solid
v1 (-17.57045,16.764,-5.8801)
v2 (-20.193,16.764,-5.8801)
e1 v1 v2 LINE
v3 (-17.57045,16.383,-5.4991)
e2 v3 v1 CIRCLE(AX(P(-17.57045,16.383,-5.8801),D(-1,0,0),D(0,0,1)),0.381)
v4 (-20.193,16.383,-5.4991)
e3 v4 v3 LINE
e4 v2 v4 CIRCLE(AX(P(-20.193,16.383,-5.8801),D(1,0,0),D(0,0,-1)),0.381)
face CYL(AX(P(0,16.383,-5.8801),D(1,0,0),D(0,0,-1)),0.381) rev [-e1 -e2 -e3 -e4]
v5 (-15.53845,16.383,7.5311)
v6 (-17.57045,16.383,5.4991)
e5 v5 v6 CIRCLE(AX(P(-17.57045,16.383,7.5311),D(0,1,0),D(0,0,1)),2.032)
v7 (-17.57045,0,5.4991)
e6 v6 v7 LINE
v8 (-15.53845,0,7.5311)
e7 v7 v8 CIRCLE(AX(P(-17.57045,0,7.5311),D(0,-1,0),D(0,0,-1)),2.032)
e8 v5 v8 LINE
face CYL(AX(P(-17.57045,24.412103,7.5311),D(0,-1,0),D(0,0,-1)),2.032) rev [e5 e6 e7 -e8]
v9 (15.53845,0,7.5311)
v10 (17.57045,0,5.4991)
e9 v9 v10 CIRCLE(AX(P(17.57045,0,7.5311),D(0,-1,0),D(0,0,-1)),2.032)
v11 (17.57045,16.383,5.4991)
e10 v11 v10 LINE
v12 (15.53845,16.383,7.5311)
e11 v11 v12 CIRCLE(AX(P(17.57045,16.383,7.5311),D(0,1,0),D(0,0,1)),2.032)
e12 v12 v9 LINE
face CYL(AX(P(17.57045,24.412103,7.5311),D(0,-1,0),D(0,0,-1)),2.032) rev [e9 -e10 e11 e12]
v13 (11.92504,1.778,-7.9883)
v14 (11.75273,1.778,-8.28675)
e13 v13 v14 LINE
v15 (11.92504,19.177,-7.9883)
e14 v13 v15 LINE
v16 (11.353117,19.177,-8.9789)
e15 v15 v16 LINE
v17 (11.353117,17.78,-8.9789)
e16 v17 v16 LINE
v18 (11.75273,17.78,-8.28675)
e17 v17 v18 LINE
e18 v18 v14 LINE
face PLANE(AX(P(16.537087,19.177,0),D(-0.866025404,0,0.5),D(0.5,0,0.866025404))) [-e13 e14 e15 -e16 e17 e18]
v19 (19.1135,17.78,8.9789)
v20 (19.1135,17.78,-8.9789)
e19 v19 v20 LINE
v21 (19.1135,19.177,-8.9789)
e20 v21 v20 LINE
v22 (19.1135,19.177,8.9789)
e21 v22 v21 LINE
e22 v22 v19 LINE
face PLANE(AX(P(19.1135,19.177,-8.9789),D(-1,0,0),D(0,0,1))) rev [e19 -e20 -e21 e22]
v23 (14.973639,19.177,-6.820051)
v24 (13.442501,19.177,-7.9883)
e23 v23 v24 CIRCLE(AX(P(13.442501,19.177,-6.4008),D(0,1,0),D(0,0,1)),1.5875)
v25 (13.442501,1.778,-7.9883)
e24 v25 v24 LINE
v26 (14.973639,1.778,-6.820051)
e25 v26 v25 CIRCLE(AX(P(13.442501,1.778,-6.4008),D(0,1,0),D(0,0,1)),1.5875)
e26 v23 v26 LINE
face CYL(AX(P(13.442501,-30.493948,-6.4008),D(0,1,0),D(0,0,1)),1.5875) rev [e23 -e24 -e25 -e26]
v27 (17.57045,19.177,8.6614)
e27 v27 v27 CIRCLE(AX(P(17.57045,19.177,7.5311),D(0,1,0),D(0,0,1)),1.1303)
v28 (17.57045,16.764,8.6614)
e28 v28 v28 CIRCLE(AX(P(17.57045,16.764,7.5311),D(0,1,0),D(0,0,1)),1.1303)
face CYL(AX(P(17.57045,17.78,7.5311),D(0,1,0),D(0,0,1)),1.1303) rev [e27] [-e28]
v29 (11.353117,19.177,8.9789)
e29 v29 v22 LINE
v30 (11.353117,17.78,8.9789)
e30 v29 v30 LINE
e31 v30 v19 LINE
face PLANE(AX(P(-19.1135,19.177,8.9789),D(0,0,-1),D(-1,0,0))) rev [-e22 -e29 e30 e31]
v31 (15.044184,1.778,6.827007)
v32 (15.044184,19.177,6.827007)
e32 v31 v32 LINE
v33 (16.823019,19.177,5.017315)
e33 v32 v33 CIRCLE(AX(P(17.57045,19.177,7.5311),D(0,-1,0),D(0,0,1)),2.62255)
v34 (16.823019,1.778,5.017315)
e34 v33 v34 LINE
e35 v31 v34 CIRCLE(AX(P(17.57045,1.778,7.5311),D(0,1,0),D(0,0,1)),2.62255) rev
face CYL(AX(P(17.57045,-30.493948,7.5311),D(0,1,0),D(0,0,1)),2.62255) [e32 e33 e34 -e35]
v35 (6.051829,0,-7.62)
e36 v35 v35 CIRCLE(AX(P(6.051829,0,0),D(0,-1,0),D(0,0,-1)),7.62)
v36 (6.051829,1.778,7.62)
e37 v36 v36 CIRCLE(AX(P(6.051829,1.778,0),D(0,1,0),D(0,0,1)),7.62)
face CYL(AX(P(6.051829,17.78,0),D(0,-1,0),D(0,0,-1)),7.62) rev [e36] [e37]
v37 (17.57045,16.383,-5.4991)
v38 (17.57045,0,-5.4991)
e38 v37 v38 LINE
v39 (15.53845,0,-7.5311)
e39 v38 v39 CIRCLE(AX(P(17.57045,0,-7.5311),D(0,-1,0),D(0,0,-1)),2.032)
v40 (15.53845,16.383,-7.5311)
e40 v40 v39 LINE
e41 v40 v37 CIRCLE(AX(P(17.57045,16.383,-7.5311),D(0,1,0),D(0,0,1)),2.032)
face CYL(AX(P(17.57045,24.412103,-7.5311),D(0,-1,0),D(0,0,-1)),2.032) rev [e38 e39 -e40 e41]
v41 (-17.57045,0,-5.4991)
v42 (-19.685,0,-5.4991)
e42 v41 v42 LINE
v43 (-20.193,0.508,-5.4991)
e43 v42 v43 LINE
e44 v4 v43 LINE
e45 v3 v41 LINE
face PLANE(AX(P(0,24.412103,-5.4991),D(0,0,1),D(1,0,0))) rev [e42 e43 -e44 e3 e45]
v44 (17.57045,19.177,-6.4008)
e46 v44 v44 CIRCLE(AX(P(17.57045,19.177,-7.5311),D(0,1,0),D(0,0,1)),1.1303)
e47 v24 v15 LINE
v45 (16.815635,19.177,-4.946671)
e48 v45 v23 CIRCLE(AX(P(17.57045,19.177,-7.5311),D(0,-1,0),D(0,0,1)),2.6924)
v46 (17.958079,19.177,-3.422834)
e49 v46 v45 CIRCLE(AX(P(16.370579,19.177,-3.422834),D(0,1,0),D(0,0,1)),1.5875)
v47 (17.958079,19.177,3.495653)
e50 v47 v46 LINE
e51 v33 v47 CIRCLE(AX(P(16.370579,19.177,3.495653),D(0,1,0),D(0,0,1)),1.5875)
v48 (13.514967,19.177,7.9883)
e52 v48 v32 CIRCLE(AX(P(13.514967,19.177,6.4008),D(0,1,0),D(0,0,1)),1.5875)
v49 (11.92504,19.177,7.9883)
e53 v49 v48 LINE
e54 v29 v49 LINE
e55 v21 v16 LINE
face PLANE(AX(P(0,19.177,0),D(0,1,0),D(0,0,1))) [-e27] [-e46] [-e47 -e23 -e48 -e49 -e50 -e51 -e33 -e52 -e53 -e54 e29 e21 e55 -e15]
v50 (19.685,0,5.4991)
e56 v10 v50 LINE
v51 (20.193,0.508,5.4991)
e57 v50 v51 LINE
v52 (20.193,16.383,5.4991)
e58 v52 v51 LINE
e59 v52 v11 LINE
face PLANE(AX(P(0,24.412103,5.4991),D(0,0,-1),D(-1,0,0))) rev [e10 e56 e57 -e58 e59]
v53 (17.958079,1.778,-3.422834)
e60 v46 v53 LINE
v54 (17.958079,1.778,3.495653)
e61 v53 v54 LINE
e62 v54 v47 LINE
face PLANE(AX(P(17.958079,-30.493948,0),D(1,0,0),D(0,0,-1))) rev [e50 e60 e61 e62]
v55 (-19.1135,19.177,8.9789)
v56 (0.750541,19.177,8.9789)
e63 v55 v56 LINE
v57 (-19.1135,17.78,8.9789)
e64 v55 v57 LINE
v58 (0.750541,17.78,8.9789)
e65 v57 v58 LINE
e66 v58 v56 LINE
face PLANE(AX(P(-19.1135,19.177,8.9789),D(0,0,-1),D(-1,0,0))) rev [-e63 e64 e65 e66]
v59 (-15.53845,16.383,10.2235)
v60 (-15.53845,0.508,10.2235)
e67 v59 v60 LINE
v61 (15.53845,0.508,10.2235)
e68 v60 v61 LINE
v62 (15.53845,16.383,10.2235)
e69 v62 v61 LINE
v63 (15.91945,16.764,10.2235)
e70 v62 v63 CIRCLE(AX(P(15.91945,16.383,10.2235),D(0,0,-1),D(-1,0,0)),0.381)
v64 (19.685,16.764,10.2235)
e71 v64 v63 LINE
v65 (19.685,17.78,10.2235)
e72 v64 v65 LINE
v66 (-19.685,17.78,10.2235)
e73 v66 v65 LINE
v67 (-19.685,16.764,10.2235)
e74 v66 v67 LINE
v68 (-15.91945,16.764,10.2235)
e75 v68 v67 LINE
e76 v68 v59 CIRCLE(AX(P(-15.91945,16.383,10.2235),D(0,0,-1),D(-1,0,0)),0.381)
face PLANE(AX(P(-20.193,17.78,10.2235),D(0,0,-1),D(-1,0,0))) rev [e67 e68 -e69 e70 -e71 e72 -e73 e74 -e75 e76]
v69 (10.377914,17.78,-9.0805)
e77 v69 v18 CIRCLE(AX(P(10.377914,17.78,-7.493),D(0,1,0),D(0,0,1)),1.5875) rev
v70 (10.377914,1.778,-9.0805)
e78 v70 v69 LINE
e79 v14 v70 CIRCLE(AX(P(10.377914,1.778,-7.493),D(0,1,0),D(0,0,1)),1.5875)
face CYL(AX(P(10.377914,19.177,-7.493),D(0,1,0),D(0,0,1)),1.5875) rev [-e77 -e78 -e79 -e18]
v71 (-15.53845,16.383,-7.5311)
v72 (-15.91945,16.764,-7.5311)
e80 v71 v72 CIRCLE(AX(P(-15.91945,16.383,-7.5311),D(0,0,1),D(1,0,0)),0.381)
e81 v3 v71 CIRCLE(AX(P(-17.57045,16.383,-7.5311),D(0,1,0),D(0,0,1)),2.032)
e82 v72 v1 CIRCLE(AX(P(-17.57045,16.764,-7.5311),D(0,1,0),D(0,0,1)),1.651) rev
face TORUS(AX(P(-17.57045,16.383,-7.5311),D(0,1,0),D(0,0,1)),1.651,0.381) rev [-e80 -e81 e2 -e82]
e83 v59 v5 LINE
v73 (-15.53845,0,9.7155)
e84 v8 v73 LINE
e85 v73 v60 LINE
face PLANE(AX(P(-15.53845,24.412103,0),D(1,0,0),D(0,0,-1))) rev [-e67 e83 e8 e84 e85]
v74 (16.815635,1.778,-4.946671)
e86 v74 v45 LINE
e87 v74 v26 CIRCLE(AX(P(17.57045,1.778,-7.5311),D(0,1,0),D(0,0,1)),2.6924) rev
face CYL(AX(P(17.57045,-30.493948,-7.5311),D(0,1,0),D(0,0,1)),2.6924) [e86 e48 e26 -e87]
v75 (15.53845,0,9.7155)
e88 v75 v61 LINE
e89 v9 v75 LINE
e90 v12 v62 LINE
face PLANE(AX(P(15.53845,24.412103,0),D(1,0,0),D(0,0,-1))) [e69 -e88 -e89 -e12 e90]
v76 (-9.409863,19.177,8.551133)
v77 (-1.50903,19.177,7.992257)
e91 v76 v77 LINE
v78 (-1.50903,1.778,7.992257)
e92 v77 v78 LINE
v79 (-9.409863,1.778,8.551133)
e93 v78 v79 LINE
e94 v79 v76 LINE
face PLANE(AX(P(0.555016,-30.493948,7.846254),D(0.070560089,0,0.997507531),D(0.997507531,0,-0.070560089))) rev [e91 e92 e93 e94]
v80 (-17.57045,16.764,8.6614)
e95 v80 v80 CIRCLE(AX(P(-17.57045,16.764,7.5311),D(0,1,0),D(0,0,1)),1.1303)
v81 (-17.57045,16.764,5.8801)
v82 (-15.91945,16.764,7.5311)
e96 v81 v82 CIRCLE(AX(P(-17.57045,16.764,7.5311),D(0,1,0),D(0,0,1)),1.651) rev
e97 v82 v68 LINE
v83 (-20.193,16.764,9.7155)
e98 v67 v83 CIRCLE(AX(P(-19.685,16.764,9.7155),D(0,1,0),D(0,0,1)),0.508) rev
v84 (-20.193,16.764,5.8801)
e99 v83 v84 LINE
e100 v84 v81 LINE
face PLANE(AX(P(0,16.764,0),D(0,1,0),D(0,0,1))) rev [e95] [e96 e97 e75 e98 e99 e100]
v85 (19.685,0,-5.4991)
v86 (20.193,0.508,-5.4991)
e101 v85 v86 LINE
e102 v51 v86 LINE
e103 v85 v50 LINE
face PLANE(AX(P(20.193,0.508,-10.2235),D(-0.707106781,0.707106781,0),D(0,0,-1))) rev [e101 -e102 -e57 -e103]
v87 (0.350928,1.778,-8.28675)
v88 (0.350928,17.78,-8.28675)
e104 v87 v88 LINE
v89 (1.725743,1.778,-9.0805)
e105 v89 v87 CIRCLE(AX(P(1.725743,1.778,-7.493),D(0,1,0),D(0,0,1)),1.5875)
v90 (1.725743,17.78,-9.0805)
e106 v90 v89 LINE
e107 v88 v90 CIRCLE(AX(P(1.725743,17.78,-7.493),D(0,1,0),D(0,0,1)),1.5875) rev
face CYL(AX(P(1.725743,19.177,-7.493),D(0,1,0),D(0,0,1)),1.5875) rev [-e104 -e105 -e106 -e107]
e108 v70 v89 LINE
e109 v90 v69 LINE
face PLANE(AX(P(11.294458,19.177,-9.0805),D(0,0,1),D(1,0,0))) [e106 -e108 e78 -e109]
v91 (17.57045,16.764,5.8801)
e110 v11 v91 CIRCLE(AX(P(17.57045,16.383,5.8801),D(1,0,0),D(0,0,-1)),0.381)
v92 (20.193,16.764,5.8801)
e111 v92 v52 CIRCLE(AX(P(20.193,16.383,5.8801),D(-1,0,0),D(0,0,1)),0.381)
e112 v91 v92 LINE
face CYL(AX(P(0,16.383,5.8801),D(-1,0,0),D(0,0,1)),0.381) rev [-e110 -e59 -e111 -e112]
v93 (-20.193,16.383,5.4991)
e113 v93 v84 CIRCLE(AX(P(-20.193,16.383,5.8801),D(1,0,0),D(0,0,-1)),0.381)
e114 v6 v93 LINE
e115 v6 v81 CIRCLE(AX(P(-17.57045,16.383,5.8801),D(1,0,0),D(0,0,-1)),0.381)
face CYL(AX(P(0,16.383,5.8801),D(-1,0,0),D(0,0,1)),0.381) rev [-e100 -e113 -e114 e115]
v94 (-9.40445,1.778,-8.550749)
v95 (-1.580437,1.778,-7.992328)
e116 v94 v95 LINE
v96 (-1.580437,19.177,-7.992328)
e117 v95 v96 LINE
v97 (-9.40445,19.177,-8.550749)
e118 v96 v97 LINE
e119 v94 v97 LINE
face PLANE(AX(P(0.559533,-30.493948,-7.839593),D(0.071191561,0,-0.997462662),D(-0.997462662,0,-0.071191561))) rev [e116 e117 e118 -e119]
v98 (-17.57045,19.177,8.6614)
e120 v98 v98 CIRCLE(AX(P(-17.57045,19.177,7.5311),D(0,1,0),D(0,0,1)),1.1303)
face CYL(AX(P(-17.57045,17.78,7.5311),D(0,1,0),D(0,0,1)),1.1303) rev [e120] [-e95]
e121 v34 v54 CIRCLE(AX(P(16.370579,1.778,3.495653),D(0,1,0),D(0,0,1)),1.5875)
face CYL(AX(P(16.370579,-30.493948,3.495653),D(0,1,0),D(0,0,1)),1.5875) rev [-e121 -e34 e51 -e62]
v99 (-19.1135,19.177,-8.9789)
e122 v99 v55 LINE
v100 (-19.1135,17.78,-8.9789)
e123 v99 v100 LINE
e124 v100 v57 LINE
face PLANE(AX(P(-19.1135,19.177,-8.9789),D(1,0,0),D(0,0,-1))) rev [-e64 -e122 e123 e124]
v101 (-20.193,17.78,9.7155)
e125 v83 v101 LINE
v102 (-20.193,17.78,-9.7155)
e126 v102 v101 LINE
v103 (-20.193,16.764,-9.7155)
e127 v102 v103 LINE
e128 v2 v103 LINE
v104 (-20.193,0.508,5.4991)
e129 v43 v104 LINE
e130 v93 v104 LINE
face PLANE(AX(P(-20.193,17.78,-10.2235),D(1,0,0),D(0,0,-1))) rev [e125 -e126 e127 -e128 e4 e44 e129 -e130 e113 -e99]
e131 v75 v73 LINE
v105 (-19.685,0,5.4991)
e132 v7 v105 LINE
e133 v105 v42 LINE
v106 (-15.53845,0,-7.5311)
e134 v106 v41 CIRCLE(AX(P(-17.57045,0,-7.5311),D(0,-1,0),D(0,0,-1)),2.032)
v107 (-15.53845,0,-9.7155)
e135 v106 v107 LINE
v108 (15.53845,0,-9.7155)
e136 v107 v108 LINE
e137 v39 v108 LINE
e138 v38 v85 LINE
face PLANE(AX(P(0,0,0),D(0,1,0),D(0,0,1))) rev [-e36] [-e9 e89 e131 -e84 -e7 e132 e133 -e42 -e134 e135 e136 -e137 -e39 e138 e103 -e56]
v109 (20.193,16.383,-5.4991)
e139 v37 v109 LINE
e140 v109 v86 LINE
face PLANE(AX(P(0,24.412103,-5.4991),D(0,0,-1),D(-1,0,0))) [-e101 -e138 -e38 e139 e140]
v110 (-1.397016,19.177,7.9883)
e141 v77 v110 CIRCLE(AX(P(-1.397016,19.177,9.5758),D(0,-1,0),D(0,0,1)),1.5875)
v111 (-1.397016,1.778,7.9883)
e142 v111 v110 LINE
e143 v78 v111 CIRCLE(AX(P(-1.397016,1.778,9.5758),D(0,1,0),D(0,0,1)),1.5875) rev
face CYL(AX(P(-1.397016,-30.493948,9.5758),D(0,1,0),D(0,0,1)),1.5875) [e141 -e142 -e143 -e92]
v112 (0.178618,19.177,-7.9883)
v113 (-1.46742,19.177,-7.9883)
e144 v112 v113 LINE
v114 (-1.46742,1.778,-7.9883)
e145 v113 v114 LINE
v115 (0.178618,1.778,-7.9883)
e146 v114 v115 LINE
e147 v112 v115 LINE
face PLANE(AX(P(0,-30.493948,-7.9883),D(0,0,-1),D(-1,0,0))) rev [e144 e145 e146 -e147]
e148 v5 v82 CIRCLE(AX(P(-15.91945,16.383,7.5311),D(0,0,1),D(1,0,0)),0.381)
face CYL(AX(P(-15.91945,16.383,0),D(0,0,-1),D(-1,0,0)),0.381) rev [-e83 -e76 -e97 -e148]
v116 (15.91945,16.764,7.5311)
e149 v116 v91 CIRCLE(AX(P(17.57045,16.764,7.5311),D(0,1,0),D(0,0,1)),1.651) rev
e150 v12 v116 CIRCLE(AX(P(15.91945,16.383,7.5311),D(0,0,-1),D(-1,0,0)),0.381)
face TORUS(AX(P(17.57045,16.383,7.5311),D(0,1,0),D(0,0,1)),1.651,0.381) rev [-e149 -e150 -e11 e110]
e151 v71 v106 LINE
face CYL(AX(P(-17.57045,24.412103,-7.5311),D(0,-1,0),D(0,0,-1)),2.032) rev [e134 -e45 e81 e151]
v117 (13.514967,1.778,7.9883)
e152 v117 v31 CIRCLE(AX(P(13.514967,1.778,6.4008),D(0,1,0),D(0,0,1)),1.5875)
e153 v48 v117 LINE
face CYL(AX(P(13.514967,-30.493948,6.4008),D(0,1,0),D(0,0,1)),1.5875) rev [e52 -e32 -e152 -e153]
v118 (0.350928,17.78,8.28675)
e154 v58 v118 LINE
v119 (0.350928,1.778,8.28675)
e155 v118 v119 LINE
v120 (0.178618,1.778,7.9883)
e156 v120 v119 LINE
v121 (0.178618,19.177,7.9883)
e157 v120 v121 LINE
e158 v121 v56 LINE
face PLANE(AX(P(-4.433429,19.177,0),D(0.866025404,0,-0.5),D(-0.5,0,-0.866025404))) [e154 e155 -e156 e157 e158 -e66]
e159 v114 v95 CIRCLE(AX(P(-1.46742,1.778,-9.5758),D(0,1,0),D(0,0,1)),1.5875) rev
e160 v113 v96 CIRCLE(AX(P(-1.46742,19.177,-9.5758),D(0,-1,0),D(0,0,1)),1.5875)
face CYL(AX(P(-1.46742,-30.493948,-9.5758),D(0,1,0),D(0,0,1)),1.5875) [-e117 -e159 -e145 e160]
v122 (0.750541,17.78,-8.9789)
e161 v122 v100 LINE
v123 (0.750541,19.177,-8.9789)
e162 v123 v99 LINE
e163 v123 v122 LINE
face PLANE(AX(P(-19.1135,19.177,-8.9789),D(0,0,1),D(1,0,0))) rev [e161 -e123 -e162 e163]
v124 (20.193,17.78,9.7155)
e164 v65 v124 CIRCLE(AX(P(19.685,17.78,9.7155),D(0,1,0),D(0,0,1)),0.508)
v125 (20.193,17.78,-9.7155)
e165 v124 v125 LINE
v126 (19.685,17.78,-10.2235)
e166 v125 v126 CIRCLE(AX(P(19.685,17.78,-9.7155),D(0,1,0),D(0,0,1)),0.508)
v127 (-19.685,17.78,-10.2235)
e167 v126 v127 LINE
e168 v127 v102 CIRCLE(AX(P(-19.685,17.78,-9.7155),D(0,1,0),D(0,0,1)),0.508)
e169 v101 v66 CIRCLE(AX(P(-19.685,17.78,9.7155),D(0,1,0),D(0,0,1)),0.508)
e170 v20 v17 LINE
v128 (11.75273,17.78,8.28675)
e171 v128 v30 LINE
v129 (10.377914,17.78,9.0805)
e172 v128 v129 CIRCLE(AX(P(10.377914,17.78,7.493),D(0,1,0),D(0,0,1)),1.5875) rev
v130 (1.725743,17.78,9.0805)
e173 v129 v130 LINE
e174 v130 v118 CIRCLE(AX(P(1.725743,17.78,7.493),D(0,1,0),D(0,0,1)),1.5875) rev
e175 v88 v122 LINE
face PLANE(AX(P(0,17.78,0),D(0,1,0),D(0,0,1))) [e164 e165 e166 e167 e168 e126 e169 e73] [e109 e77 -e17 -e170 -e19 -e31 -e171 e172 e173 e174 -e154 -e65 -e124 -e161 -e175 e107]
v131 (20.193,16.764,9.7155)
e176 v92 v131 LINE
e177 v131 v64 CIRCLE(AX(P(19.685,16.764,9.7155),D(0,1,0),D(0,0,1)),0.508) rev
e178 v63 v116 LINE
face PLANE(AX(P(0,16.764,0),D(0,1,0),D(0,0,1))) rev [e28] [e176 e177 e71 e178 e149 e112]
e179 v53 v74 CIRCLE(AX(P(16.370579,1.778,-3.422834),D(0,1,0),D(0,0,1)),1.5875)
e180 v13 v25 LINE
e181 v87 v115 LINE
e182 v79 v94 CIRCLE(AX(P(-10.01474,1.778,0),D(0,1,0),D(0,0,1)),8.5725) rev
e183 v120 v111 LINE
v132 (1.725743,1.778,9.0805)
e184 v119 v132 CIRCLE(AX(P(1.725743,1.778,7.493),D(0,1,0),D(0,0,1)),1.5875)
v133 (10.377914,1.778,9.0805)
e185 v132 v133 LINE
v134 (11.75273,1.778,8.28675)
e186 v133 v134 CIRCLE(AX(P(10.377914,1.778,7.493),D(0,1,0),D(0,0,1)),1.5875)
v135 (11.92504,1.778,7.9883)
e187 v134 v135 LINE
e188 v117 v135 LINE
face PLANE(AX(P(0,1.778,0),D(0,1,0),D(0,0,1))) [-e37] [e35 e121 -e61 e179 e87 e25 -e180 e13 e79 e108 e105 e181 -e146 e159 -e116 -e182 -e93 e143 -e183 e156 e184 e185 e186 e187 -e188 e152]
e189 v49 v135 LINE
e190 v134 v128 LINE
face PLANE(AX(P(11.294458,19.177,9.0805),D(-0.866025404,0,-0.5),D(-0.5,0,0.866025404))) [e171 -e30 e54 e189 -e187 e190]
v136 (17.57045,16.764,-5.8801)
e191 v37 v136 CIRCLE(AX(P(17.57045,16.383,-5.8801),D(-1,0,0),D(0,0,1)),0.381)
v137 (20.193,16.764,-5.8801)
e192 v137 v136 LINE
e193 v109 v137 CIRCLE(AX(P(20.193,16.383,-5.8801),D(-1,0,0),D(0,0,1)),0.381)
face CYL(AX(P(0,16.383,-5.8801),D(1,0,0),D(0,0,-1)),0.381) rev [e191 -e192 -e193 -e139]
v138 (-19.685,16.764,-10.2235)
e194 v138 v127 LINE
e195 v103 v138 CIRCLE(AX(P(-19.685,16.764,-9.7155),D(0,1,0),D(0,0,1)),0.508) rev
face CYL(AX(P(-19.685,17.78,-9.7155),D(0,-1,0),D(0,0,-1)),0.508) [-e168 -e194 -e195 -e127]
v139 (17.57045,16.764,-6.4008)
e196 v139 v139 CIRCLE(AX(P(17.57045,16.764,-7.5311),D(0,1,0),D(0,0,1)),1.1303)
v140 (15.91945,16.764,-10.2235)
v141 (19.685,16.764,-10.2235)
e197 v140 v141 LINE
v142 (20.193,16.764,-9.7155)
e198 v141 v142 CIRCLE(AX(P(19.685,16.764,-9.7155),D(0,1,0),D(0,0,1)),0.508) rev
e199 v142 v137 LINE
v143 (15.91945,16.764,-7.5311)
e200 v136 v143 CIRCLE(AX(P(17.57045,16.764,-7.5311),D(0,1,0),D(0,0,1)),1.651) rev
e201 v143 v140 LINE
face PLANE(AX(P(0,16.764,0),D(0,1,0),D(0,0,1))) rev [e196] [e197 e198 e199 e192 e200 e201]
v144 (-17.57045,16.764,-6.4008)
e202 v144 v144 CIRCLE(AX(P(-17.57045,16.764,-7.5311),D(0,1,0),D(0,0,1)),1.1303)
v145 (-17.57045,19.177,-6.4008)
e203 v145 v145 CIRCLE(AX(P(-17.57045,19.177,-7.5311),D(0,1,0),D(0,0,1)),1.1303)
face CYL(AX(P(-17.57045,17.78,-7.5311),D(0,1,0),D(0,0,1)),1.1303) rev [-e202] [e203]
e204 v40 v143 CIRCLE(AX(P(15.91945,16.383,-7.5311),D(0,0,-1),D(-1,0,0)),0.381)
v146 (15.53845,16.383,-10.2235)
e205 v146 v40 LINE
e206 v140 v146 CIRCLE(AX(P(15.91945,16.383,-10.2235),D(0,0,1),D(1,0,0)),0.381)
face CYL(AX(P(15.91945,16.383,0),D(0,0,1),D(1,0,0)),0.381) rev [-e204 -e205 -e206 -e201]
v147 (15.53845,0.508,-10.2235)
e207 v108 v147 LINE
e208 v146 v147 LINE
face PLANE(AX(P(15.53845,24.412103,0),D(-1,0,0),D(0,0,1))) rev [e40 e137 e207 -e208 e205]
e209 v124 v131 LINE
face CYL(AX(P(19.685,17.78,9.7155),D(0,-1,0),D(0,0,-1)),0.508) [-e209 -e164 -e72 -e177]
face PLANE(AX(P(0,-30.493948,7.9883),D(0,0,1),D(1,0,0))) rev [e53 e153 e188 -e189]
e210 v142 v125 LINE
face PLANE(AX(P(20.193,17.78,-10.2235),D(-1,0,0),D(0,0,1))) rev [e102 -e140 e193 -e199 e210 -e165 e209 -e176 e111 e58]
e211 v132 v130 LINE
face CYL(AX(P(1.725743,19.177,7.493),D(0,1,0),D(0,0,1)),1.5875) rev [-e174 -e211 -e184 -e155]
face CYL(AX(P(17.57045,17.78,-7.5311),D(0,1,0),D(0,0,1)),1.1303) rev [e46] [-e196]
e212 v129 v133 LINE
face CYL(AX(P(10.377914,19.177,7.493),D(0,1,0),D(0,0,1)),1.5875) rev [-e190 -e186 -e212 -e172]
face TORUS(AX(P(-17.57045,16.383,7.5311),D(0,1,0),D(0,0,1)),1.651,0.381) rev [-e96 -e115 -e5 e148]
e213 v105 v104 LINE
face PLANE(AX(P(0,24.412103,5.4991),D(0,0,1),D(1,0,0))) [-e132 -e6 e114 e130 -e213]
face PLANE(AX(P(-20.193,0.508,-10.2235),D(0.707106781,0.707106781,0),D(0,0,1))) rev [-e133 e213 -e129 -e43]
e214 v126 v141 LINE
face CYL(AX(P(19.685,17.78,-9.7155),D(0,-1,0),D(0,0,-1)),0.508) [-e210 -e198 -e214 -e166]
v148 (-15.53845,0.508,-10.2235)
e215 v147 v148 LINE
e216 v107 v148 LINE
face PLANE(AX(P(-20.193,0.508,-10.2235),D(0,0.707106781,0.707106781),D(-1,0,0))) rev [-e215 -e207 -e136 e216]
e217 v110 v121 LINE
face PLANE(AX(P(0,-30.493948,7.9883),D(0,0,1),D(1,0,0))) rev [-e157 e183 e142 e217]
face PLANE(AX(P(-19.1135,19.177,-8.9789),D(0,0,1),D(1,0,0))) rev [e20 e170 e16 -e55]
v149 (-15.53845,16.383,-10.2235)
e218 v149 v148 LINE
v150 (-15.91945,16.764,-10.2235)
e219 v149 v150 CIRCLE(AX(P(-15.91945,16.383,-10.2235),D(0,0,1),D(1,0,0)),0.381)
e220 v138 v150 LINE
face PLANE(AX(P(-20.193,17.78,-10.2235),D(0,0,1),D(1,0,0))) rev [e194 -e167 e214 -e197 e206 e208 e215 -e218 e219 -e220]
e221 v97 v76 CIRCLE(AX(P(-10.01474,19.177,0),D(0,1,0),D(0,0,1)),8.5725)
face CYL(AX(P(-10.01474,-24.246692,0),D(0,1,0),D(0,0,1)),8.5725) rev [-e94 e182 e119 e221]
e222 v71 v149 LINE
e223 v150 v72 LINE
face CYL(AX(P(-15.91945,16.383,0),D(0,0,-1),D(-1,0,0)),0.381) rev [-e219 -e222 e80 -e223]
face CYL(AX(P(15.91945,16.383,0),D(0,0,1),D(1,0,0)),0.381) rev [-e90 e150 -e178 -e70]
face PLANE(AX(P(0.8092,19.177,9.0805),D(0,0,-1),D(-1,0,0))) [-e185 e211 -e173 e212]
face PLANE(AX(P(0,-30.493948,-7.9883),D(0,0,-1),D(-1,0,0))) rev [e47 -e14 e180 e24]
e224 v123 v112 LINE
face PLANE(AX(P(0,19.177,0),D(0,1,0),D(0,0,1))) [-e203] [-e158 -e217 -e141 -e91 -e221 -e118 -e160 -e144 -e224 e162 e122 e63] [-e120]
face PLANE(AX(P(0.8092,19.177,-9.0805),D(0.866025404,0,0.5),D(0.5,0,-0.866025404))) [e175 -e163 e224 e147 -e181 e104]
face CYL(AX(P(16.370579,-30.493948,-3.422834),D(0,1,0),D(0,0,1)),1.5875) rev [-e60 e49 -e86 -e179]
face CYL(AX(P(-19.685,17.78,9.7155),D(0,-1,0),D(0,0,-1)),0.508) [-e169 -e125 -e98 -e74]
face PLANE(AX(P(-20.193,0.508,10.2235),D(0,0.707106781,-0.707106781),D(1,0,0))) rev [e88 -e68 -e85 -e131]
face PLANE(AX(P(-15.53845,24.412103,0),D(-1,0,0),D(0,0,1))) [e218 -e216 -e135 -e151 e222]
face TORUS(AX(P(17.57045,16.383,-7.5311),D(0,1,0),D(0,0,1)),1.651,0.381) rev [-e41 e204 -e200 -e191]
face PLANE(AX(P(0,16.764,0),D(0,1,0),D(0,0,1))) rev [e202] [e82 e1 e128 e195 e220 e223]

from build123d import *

# Parameters (mm, degrees)
SKETCH1_W             = 40.386
SKETCH1_H             = 20.447
BOSS_EXTRUDE1_DEPTH   = 17.78
FILLET1_R             = 0.508
CHAMFER1_SIZE         = 0.508
F_2_CLEARANCE_HOLE1_D = 2.2606
SKETCH6_R             = 8.5725
CUT_EXTRUDE1_DEPTH    = 16.002
CUT_EXTRUDE4_DEPTH    = 16.002
FILLET3_R             = 1.5875
SKETCH9_R             = 1.1303
CUT_EXTRUDE5_DEPTH    = 16.764
FILLET5_R             = 0.381
SKETCH11_R            = 7.62
CUT_EXTRUDE7_DEPTH    = 29.782036086
BOSS_EXTRUDE3_START   = 1.397
SKETCH12_W            = 38.227
SKETCH12_H            = 17.9578
SKETCH12_R            = 1.1303
BOSS_EXTRUDE3_DEPTH   = 1.397
CUT_EXTRUDE8_DEPTH    = 29.548246921
FILLET7_R             = 1.5875
CUT_EXTRUDE9_DEPTH    = 1.397


with BuildPart() as part:
    # Sketch1 → Boss-Extrude1 (new body)
    with BuildSketch(Plane(origin=(0, 0, 0), x_dir=(1, 0, 0), z_dir=(0, 1, 0))):
        Rectangle(SKETCH1_W, SKETCH1_H)
    extrude(amount=BOSS_EXTRUDE1_DEPTH)

    # Fillet1
    fillet1_edges = [part.edges().sort_by_distance(p)[0] for p in [
        (20.193, 8.89, 10.2235),
        (-20.193, 8.89, 10.2235),
        (-20.193, 8.89, -10.2235),
        (20.193, 8.89, -10.2235),
    ]]
    fillet(fillet1_edges, radius=FILLET1_R)

    # Chamfer1
    chamfer1_edges = [part.edges().sort_by_distance(p)[0] for p in [
        (20.193, 0, 0),
        (0, 0, 10.2235),
        (-20.193, 0, 0),
        (0, 0, -10.2235),
        (-20.044210245, 0, 10.074710245),
        (-20.044210245, 0, -10.074710245),
        (20.044210245, 0, -10.074710245),
        (20.044210245, 0, 10.074710245),
    ]]
    chamfer(chamfer1_edges, length=CHAMFER1_SIZE)

    # #2 Clearance Hole1 (through all)
    with Locations(Plane(origin=(0, 17.78, 0), x_dir=(1, 0, 0), z_dir=(0, 1, 0))):
        with Locations((17.57045, -7.5311), (-17.57045, 7.5311), (-17.57045, -7.5311), (17.57045, 7.5311)):
            Hole(F_2_CLEARANCE_HOLE1_D / 2)

    # Sketch6 → Cut-Extrude1 (cut)
    with BuildSketch(Plane(origin=(0, 17.78, 0), x_dir=(1, 0, 0), z_dir=(0, 1, 0))):
        with Locations(Location((-10.014739789, 0, 0), (0, 0, 270))):
            Circle(SKETCH6_R)
    extrude(amount=-CUT_EXTRUDE1_DEPTH, mode=Mode.SUBTRACT)

    # Sketch10 → Cut-Extrude4 (cut)
    with BuildSketch(Plane(origin=(0, 17.78, 0), x_dir=(1, 0, 0), z_dir=(0, 1, 0))):
        with BuildLine():
            Line((-1.45309254, -7.9883), (14.988060281, -7.9883))
            ThreePointArc((14.988060281, -7.9883), (15.691271985, -5.7017672), (17.958078801, -4.937355137))
            Line((17.958078801, -4.937355137), (17.958078801, 4.866749859))
            ThreePointArc((17.958078801, 4.866749859), (15.641892996, 5.652354237), (14.917152821, 7.9883))
            Line((14.917152821, 7.9883), (-1.524, 7.9883))
            Line((-1.524, 7.9883), (-9.404450133, 8.550748668))
            ThreePointArc((-9.404450133, 8.550748668), (-1.442240219, -0.00271347), (-9.409863426, -8.551133307))
            Line((-9.409863426, -8.551133307), (-1.45309254, -7.9883))
        make_face()
    extrude(amount=-CUT_EXTRUDE4_DEPTH, mode=Mode.SUBTRACT)

    # Fillet3
    # the kernel refuses this fillet: 1.5875 mm, written as the material it adds along each edge
    with BuildSketch(Plane(origin=(14.917152821, 17.78, -7.9883), x_dir=(-1, 0, 0), z_dir=(0, -1, 0))) as fillet3_piece_1:
        with BuildLine():
            CenterArc((1.474652181, -1.5875), FILLET3_R, 90, 74.686818151)
            ThreePointArc((-0.056486306, -1.168249258), (0.035961125, -0.587228986), (0, 0))
            Line((0, 0), (1.474652181, 0))
        make_face()
    extrude(amount=16.002)
    with BuildSketch(Plane(origin=(17.958078801, 17.78, -4.866749859), x_dir=(-0.9975619874511197, 0, -0.06978596701753238), z_dir=(0, -1, 0))) as fillet3_piece_2:
        with BuildLine():
            CenterArc((1.48286456, -1.551181233), FILLET3_R, 102.279418141, 73.718887891)
            Line((-0.100765095, -1.44039601), (0, 0))
            ThreePointArc((0, 0), (0.572618009, -0.061596629), (1.145236017, 0))
        make_face()
    extrude(amount=16.002)
    with BuildSketch(Plane(origin=(17.958078801, 17.78, 4.937355137), x_dir=(0, 0, -1), z_dir=(0, -1, 0))) as fillet3_piece_3:
        with BuildLine():
            CenterArc((1.441701842, -1.5875), FILLET3_R, 90, 73.441052757)
            ThreePointArc((-0.079959812, -1.13505988), (0.022321973, -0.571918824), (0, 0))
            Line((0, 0), (1.441701842, 0))
        make_face()
    extrude(amount=16.002)
    with BuildSketch(Plane(origin=(14.988060281, 17.78, 7.9883), x_dir=(0.048272098089337995, 0, -0.9988342227547339), z_dir=(0, -1, 0))) as fillet3_piece_4:
        with BuildLine():
            CenterArc((1.514540022, -1.548008005), FILLET3_R, 102.806774289, 74.426362957)
            Line((-0.071109307, -1.47137605), (0, 0))
            ThreePointArc((0, 0), (0.581324376, -0.065240775), (1.162648753, 0))
        make_face()
    extrude(amount=16.002)
    # the kernel refuses this fillet: 1.5875 mm, written as the material it takes off along each edge
    with BuildSketch(Plane(origin=(-1.524, 17.921450207, -7.9883), x_dir=(-0.9974626617850719, 0, -0.0711915609088555), z_dir=(0, -1, 0))) as fillet3_2_piece_1:
        with BuildLine():
            CenterArc((FILLET3_R * 0.0356409970864, FILLET3_R), FILLET3_R, 265.917570604, 4.082429396)
            Line((-FILLET3_R * 0.0355505638225, FILLET3_R * 0.00253733821493), (0, 0))
            Line((0, 0), (FILLET3_R * 0.0356409970864, 0))
        make_face()
    extrude(amount=16.143450207, mode=Mode.SUBTRACT)
    with BuildSketch(Plane(origin=(-1.45309254, 17.920192389, 7.9883), x_dir=(-0.9975075307142005, 0, 0.07056008906214724), z_dir=(0, -1, 0))) as fillet3_2_piece_2:
        with BuildLine():
            CenterArc((FILLET3_R * 0.0353240666066, -FILLET3_R), FILLET3_R, 90, 4.046157505)
            Line((-FILLET3_R * 0.0352360224555, -FILLET3_R * 0.0024924692858), (0, 0))
            Line((0, 0), (FILLET3_R * 0.0353240666066, 0))
        make_face()
    extrude(amount=16.142192389, mode=Mode.SUBTRACT)

    # Sketch9 → Cut-Extrude5 (cut)
    # profile 1 of 8: a face of its own
    with BuildSketch(Plane.XZ):
        with BuildLine():
            Line((-19.685, 9.7155), (-19.685, 5.4991))
            Line((-19.685, 5.4991), (-17.57045, 5.4991))
            ThreePointArc((-17.57045, 5.4991), (-16.133609021, 6.094259021), (-15.53845, 7.5311))
            Line((-15.53845, 7.5311), (-15.53845, 9.7155))
            Line((-15.53845, 9.7155), (-19.685, 9.7155))
        make_face()
        with Locations(Location((-17.57045, 7.5311, 0), (0, 0, 90))):
            Circle(SKETCH9_R, mode=Mode.SUBTRACT)
    # profile 2 of 8: a face of its own
    with BuildSketch(Plane.XZ):
        with BuildLine():
            Line((-20.193, 5.4991), (-19.685, 5.4991))
            Line((-19.685, 5.4991), (-19.685, 9.7155))
            Line((-19.685, 9.7155), (-15.53845, 9.7155))
            Line((-15.53845, 9.7155), (-15.53845, 10.2235))
            Line((-15.53845, 10.2235), (-19.685, 10.2235))
            ThreePointArc((-19.685, 10.2235), (-20.044210245, 10.074710245), (-20.193, 9.7155))
            Line((-20.193, 9.7155), (-20.193, 5.4991))
        make_face()
    # profile 3 of 8: a face of its own
    with BuildSketch(Plane.XZ):
        with BuildLine():
            ThreePointArc((-15.53845, -7.5311), (-16.133609021, -6.094259021), (-17.57045, -5.4991))
            Line((-17.57045, -5.4991), (-19.685, -5.4991))
            Line((-19.685, -5.4991), (-19.685, -9.7155))
            Line((-19.685, -9.7155), (-15.53845, -9.7155))
            Line((-15.53845, -9.7155), (-15.53845, -7.5311))
        make_face()
        with Locations(Location((-17.57045, -7.5311, 0), (0, 0, 90))):
            Circle(SKETCH9_R, mode=Mode.SUBTRACT)
    # profile 4 of 8: a face of its own
    with BuildSketch(Plane.XZ):
        with BuildLine():
            Line((-19.685, -9.7155), (-19.685, -5.4991))
            Line((-19.685, -5.4991), (-20.193, -5.4991))
            Line((-20.193, -5.4991), (-20.193, -9.7155))
            ThreePointArc((-20.193, -9.7155), (-20.044210245, -10.074710245), (-19.685, -10.2235))
            Line((-19.685, -10.2235), (-15.53845, -10.2235))
            Line((-15.53845, -10.2235), (-15.53845, -9.7155))
            Line((-15.53845, -9.7155), (-19.685, -9.7155))
        make_face()
    # profile 5 of 8: a face of its own
    with BuildSketch(Plane.XZ):
        with BuildLine():
            Line((19.685, 9.7155), (15.53845, 9.7155))
            Line((15.53845, 9.7155), (15.53845, 7.5311))
            ThreePointArc((15.53845, 7.5311), (16.133609021, 6.094259021), (17.57045, 5.4991))
            Line((17.57045, 5.4991), (19.685, 5.4991))
            Line((19.685, 5.4991), (19.685, 9.7155))
        make_face()
        with Locations(Location((17.57045, 7.5311, 0), (0, 0, 90))):
            Circle(SKETCH9_R, mode=Mode.SUBTRACT)
    # profile 6 of 8: a face of its own
    with BuildSketch(Plane.XZ):
        with BuildLine():
            Line((15.53845, 10.2235), (15.53845, 9.7155))
            Line((15.53845, 9.7155), (19.685, 9.7155))
            Line((19.685, 9.7155), (19.685, 5.4991))
            Line((19.685, 5.4991), (20.193, 5.4991))
            Line((20.193, 5.4991), (20.193, 9.7155))
            ThreePointArc((20.193, 9.7155), (20.044210245, 10.074710245), (19.685, 10.2235))
            Line((19.685, 10.2235), (15.53845, 10.2235))
        make_face()
    # profile 7 of 8: a face of its own
    with BuildSketch(Plane.XZ):
        with BuildLine():
            Line((15.53845, -7.5311), (15.53845, -9.7155))
            Line((15.53845, -9.7155), (19.685, -9.7155))
            Line((19.685, -9.7155), (19.685, -5.4991))
            Line((19.685, -5.4991), (17.57045, -5.4991))
            ThreePointArc((17.57045, -5.4991), (16.133609021, -6.094259021), (15.53845, -7.5311))
        make_face()
        with Locations(Location((17.57045, -7.5311, 0), (0, 0, 90))):
            Circle(SKETCH9_R, mode=Mode.SUBTRACT)
    # profile 8 of 8: a face of its own
    with BuildSketch(Plane.XZ):
        with BuildLine():
            Line((19.685, -9.7155), (15.53845, -9.7155))
            Line((15.53845, -9.7155), (15.53845, -10.2235))
            Line((15.53845, -10.2235), (19.685, -10.2235))
            ThreePointArc((19.685, -10.2235), (20.044210245, -10.074710245), (20.193, -9.7155))
            Line((20.193, -9.7155), (20.193, -5.4991))
            Line((20.193, -5.4991), (19.685, -5.4991))
            Line((19.685, -5.4991), (19.685, -9.7155))
        make_face()
    extrude(amount=-CUT_EXTRUDE5_DEPTH, mode=Mode.SUBTRACT)

    # Fillet5
    fillet5_edges = [part.edges().sort_by_distance(p)[0] for p in [
        (-16.133609021, 16.764, -6.094259021),
        (-18.881725, 16.764, -5.4991),
        (-15.53845, 16.764, -8.8773),
        (16.133609021, 16.764, 6.094259021),
        (18.881725, 16.764, 5.4991),
        (15.53845, 16.764, 8.8773),
        (16.133609021, 16.764, -6.094259021),
        (15.53845, 16.764, -8.8773),
        (18.881725, 16.764, -5.4991),
        (-16.133609021, 16.764, 6.094259021),
        (-15.53845, 16.764, 8.8773),
        (-18.881725, 16.764, 5.4991),
    ]]
    fillet(fillet5_edges, radius=FILLET5_R)

    # Sketch11 → Cut-Extrude7 (cut, through all)
    with BuildSketch(Plane.XZ):
        with Locations(Location((6.051828801, 0, 0), (0, 0, 270))):
            Circle(SKETCH11_R)
    extrude(amount=-CUT_EXTRUDE7_DEPTH, mode=Mode.SUBTRACT)

    # Sketch12 → Boss-Extrude3 (add)
    with BuildSketch(Plane(origin=(0, 17.78, 0), x_dir=(1, 0, 0), z_dir=(0, 1, 0)).offset(BOSS_EXTRUDE3_START)):
        Rectangle(SKETCH12_W, SKETCH12_H)
        with Locations(Location((17.57045, -7.5311, 0), (0, 0, 270))):
            Circle(SKETCH12_R, mode=Mode.SUBTRACT)
        with Locations(Location((17.57045, 7.5311, 0), (0, 0, 270))):
            Circle(SKETCH12_R, mode=Mode.SUBTRACT)
        with Locations(Location((-17.57045, -7.5311, 0), (0, 0, 270))):
            Circle(SKETCH12_R, mode=Mode.SUBTRACT)
        with Locations(Location((-17.57045, 7.5311, 0), (0, 0, 270))):
            Circle(SKETCH12_R, mode=Mode.SUBTRACT)
        with BuildLine():
            Line((17.958078801, -3.495653295), (17.958078801, 3.422833563))
            ThreePointArc((17.958078801, 3.422833563), (17.640752565, 4.375101834), (16.815634884, 4.946671262))
            ThreePointArc((16.815634884, 4.946671262), (15.6506227, 5.643434538), (14.973639127, 6.820050742))
            ThreePointArc((14.973639127, 6.820050742), (14.405463697, 7.662884942), (13.44250064, 7.9883))
            Line((13.44250064, 7.9883), (-1.467419917, 7.9883))
            ThreePointArc((-1.467419917, 7.9883), (-1.523964098, 7.989307326), (-1.58043652, 7.992328024))
            Line((-1.58043652, 7.992328024), (-9.404450133, 8.550748668))
            ThreePointArc((-9.404450133, 8.550748668), (-18.58723936, 0.00271347), (-9.409863426, -8.551133307))
            Line((-9.409863426, -8.551133307), (-1.509029726, -7.992256795))
            ThreePointArc((-1.509029726, -7.992256795), (-1.453057587, -7.989289507), (-1.397015585, -7.9883))
            Line((-1.397015585, -7.9883), (13.514966932, -7.9883))
            ThreePointArc((13.514966932, -7.9883), (14.475058911, -7.665070399), (15.044183775, -6.827006637))
            ThreePointArc((15.044183775, -6.827006637), (15.70015069, -5.692690635), (16.823018922, -5.017314948))
            ThreePointArc((16.823018922, -5.017314948), (17.64305767, -4.444839146), (17.958078801, -3.495653295))
        make_face(mode=Mode.SUBTRACT)
    extrude(amount=-BOSS_EXTRUDE3_DEPTH)

    # Sketch13 → Cut-Extrude8 (cut, through all)
    with BuildSketch(Plane(origin=(0, 1.778, 0), x_dir=(1, 0, 0), z_dir=(0, 1, 0))):
        Polygon((11.294457921, -9.0805), (16.53708704, 0), (11.294457921, 9.0805), (0.809199682, 9.0805), (-4.433429437, 0), (0.809199682, -9.0805), align=None)
    extrude(amount=CUT_EXTRUDE8_DEPTH, mode=Mode.SUBTRACT)

    # Fillet7
    fillet7_edges = [part.edges().sort_by_distance(p)[0] for p in [
        (0.809199682, 9.779, -9.0805),
        (11.294457921, 9.779, -9.0805),
        (11.294457921, 9.779, 9.0805),
        (0.809199682, 9.779, 9.0805),
    ]]
    fillet(fillet7_edges, radius=FILLET7_R)

    # Sketch14 → Cut-Extrude9 (cut)
    with BuildSketch(Plane(origin=(0, 19.177, 0), x_dir=(1, 0, 0), z_dir=(0, 1, 0))):
        Polygon((11.294457921, 9.0805), (0.809199682, 9.0805), (-4.433429437, 0), (0.809199682, -9.0805), (11.294457921, -9.0805), (16.53708704, 0), align=None)
    extrude(amount=-CUT_EXTRUDE9_DEPTH, mode=Mode.SUBTRACT)


solid = part.part
